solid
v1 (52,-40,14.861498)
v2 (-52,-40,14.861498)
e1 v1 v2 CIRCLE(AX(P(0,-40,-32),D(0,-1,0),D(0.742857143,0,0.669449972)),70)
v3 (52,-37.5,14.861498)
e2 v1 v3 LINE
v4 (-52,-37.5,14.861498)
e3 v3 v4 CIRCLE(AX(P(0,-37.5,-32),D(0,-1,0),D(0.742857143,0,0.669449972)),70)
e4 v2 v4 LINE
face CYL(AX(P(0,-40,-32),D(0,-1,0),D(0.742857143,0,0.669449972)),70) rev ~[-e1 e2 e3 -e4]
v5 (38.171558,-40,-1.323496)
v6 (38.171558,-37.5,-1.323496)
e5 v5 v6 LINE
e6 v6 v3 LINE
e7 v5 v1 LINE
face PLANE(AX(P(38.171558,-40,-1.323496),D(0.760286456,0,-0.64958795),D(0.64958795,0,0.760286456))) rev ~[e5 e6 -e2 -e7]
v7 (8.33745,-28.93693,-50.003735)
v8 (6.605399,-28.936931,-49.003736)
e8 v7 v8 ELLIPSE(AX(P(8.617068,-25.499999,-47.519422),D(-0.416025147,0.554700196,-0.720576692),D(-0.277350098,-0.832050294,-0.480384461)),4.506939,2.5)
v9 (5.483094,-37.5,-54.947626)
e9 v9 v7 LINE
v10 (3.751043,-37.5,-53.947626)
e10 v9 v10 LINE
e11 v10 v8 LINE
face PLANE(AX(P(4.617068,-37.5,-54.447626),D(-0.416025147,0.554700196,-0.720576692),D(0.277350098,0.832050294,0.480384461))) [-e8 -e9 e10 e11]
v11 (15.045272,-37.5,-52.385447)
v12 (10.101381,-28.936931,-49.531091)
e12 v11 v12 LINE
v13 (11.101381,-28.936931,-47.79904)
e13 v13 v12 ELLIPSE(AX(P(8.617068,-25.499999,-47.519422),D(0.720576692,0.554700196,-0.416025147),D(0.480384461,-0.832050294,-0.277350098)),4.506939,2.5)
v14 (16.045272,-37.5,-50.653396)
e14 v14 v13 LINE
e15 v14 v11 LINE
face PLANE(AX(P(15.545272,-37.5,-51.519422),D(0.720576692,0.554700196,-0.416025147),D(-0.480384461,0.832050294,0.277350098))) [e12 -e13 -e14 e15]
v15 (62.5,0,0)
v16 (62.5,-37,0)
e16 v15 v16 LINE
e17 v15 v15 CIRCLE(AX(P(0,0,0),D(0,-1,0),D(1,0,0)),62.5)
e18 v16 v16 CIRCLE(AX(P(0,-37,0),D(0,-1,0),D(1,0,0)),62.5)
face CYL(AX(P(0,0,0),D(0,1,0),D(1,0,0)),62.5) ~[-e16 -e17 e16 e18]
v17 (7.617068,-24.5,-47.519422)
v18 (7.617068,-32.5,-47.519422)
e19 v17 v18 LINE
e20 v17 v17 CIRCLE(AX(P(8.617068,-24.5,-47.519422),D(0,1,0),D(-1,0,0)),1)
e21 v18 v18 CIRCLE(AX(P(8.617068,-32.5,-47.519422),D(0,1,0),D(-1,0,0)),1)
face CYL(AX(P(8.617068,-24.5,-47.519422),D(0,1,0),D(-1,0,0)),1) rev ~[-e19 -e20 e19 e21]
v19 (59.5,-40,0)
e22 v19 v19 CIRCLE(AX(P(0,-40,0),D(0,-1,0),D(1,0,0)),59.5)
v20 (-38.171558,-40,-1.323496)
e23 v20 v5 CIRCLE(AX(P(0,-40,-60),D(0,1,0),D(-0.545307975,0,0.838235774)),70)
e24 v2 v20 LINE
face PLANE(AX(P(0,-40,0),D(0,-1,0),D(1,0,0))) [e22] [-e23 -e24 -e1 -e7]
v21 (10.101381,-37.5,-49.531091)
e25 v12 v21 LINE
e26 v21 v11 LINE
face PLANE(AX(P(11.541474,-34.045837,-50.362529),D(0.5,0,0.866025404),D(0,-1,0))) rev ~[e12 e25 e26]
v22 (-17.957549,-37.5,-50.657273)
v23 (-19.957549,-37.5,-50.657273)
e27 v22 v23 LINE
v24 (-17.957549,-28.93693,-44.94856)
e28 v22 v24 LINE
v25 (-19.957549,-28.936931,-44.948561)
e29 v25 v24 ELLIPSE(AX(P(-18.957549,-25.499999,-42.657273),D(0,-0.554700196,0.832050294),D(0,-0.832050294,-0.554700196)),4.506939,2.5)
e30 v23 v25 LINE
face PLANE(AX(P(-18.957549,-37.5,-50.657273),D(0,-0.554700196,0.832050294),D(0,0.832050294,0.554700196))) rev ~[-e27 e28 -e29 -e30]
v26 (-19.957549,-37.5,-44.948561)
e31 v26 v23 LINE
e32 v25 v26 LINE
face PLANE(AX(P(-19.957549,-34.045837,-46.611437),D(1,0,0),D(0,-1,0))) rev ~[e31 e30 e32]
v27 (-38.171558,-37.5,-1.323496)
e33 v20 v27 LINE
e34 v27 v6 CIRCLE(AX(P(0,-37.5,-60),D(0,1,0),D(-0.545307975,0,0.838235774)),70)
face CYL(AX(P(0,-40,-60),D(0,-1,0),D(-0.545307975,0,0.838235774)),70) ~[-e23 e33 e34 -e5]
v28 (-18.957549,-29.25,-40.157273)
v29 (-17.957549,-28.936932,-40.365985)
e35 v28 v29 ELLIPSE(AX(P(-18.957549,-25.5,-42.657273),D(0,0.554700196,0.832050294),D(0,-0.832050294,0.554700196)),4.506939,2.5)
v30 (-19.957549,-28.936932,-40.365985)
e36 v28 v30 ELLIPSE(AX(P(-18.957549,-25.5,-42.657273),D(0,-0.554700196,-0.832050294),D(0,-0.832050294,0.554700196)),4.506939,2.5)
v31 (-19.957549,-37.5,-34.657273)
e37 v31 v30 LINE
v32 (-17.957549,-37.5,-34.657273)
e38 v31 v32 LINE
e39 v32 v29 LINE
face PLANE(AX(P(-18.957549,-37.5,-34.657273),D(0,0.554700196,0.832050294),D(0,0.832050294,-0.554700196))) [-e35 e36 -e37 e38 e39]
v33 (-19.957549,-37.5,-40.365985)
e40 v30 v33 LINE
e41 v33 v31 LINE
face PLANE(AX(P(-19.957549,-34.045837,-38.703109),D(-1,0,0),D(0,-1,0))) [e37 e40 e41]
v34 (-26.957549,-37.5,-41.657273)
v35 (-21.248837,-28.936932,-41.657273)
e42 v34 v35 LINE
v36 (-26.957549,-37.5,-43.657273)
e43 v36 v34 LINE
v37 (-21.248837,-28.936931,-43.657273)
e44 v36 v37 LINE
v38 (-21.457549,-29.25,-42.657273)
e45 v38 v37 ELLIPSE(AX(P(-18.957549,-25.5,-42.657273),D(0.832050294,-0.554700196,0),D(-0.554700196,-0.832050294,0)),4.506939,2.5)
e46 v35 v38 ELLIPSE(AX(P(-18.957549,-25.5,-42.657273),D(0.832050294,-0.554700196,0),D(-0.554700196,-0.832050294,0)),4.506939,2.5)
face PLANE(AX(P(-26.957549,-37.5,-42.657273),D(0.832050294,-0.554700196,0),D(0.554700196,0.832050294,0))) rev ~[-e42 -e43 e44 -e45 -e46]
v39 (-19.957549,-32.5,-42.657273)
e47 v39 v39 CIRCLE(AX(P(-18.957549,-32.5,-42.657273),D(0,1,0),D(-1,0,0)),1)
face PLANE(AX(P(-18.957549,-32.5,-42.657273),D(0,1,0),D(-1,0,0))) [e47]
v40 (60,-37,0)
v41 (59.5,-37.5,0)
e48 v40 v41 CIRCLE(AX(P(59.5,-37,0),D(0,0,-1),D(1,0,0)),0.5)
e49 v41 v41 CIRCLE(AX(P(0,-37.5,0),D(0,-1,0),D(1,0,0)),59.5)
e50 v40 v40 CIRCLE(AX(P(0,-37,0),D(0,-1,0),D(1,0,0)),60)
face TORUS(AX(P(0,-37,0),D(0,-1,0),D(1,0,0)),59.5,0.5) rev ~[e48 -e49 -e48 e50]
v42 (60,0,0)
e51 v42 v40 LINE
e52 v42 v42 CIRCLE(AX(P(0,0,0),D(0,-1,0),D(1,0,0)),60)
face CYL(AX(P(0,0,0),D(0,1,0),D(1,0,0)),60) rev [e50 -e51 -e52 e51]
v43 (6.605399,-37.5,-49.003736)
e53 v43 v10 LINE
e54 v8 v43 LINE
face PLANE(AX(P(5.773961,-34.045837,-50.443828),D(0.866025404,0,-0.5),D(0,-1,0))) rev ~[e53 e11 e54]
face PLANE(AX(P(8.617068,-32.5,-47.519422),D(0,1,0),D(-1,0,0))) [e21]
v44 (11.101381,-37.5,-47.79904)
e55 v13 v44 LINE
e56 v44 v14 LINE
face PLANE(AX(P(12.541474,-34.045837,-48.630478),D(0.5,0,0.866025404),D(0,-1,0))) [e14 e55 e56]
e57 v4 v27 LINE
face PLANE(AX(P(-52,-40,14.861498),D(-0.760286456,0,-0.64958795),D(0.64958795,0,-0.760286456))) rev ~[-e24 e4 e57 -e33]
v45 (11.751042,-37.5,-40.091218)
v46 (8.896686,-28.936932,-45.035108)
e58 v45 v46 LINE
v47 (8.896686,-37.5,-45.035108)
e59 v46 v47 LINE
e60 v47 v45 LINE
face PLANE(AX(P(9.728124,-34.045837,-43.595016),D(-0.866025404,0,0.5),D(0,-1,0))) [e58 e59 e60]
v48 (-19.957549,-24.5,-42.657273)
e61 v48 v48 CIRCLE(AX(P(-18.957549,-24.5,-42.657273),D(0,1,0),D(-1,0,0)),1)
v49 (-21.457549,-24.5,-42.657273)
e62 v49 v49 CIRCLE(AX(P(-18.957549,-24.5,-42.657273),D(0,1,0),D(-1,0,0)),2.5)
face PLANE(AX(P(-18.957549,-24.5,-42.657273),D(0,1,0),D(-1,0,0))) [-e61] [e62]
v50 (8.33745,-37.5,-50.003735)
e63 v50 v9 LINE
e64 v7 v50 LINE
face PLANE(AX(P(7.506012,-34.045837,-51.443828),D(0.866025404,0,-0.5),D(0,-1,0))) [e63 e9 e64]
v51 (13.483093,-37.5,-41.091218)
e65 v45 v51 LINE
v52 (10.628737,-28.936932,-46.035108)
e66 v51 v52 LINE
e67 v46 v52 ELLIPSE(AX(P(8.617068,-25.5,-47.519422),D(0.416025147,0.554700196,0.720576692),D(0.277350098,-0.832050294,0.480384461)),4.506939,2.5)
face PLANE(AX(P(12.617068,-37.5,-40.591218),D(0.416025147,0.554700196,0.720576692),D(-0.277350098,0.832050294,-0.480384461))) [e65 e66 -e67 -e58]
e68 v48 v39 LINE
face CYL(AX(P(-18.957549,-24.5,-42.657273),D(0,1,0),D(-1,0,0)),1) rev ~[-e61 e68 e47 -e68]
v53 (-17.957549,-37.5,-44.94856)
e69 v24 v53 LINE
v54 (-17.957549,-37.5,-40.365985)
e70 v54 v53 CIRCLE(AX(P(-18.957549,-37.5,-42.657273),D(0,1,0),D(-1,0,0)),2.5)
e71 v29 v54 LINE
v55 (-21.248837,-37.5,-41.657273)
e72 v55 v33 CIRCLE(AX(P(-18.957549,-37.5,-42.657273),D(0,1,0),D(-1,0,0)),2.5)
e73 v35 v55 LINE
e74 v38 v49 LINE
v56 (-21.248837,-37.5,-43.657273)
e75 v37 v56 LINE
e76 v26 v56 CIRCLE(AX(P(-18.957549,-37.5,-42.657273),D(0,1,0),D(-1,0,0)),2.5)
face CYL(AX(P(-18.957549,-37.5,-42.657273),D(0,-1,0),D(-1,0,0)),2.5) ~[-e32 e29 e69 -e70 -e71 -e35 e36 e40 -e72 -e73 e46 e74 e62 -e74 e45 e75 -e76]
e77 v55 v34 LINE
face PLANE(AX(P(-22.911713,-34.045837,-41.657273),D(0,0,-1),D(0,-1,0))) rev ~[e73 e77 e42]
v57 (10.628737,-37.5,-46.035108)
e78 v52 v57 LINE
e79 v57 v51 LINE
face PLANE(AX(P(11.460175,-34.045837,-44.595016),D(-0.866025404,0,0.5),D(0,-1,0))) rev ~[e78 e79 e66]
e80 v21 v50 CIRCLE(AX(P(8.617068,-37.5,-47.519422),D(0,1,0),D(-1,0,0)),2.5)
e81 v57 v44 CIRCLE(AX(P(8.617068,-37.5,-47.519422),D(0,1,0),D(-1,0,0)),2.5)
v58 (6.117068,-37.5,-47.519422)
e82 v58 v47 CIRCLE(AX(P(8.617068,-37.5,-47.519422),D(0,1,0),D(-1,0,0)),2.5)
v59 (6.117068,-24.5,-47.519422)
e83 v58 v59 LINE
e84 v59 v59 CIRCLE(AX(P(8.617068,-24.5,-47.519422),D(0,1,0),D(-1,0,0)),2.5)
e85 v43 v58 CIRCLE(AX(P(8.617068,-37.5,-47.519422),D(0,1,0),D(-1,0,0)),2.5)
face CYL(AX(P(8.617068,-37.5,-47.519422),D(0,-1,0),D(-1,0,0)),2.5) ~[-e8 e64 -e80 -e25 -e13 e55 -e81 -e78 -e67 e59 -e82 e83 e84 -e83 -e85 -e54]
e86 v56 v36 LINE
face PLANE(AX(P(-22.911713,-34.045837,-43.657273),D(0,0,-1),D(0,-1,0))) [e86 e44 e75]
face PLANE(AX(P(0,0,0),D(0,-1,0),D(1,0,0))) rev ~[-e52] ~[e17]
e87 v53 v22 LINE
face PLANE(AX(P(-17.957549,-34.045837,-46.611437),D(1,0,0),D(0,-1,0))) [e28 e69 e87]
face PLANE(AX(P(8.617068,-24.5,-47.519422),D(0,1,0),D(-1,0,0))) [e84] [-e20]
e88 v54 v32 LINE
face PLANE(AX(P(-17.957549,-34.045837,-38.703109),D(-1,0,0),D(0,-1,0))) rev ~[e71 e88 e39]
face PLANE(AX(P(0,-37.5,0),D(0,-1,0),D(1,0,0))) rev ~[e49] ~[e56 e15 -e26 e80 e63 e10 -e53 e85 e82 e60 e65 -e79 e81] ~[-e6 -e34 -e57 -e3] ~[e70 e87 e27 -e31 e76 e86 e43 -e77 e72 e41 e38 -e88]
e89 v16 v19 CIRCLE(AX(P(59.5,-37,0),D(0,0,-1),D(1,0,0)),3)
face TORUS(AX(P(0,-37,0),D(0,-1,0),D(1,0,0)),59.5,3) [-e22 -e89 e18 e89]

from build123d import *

# Parameters (mm, degrees)
F0_R             = 62.5
F1_DEPTH         = 40
F2_R             = 3
F3_T             = -2.5
F5_DEPTH         = 2.5
F6_R             = 2.5
F7_DEPTH         = 13
F8_R             = 1
F9_DEPTH         = 8
F12_DEPTH        = 1
F12_COPIES_COUNT = 3
F12_COPIES_ANGLE = 180
F15_DEPTH        = 1
F15_DEPTH_BACK   = 1
F15_COPIES_COUNT = 3
F15_COPIES_ANGLE = 180


# Not quite as in the source:
# - a pattern or mirror of a feature is missing from the dataset's text; its kind, count and spacing are read off the source's solid


with BuildPart() as f1:
    # F0 (on Front) → F1 (new body)
    with BuildSketch(Plane.XZ):
        Circle(F0_R)
    extrude(amount=F1_DEPTH)

    # F2
    f2_edges = [f1.edges().sort_by_distance(p)[0] for p in [
        (-62.5, -40, 0),
    ]]
    fillet(f2_edges, radius=F2_R)

    # F3
    f3_openings = [f1.faces().sort_by_distance(p)[0] for p in [
        (0, 0, 0),
    ]]
    offset(amount=F3_T, openings=f3_openings)

    # F4 (on face) → F5 (cut, through all)
    with BuildSketch(Plane.XZ.offset(40)):
        with BuildLine():
            ThreePointArc((52, 14.8614980554), (0, 38), (-52, 14.8614980554))
            Line((-52, 14.8614980554), (-38.1715582316, -1.3234958252))
            ThreePointArc((-38.1715582316, -1.3234958252), (0, 10), (38.1715582316, -1.3234958252))
            Line((38.1715582316, -1.3234958252), (52, 14.8614980554))
        make_face()
    extrude(amount=-F5_DEPTH, mode=Mode.SUBTRACT)

    # F6 (on face) → F7 (join)
    with BuildSketch(Plane(origin=(0, -37.5, 0), x_dir=(-1, 0, 0), z_dir=(0, 1, 0))):
        with Locations((-8.6170678389, -47.5194215546)):
            Circle(F6_R)
        with Locations((18.9575492455, -42.6572725799)):
            Circle(F6_R)
    extrude(amount=F7_DEPTH)

    # F8 (on face) → F9 (cut)
    with BuildSketch(Plane(origin=(0, -24.5, 0), x_dir=(-1, 0, 0), z_dir=(0, 1, 0))):
        with Locations((-8.6170678389, -47.5194215546)):
            Circle(F8_R)
        with Locations((18.9575492455, -42.6572725799)):
            Circle(F8_R)
    extrude(amount=-F9_DEPTH, mode=Mode.SUBTRACT)

    # F11 (on face) → F12 (join, symmetric)
    with BuildSketch(Plane(origin=(27.0393139988, 0, -15.6111552159), x_dir=(0, -1, 0), z_dir=(-0.8660254038, 0, 0.5))):
        Polygon((28.5, -34.84449232), (37.5, -34.84449232), (37.5, -28.84449232), align=None)
    f12 = extrude(amount=F12_DEPTH, both=True)

    # F12_copies: F12 ×3 about axis
    f12_copies_axis = Axis((8.617068, 0, -47.519422), (0, 1, 0))
    for i in range(1, F12_COPIES_COUNT):
        add(f12.rotate(f12_copies_axis, i * F12_COPIES_ANGLE / (F12_COPIES_COUNT - 1)))

    # F14 (on face) → F15 (join, two sides)
    with BuildSketch(Plane(origin=(-18.9575492455, 0, 0), x_dir=(0, -1, 0), z_dir=(-1, 0, 0))) as f15_sk:
        Polygon((28.5, -40.6572725799), (37.5, -40.6572725799), (37.5, -40.1572725799), (37.5, -34.6572725799), align=None)
    f15 = extrude(amount=F15_DEPTH) + extrude(f15_sk.sketch, amount=-F15_DEPTH_BACK)

    # F15_copies: F15 ×3 about axis
    f15_copies_axis = Axis((-18.957549, 0, -42.657273), (0, -1, 0))
    for i in range(1, F15_COPIES_COUNT):
        add(f15.rotate(f15_copies_axis, i * F15_COPIES_ANGLE / (F15_COPIES_COUNT - 1)))


solid = f1.part
